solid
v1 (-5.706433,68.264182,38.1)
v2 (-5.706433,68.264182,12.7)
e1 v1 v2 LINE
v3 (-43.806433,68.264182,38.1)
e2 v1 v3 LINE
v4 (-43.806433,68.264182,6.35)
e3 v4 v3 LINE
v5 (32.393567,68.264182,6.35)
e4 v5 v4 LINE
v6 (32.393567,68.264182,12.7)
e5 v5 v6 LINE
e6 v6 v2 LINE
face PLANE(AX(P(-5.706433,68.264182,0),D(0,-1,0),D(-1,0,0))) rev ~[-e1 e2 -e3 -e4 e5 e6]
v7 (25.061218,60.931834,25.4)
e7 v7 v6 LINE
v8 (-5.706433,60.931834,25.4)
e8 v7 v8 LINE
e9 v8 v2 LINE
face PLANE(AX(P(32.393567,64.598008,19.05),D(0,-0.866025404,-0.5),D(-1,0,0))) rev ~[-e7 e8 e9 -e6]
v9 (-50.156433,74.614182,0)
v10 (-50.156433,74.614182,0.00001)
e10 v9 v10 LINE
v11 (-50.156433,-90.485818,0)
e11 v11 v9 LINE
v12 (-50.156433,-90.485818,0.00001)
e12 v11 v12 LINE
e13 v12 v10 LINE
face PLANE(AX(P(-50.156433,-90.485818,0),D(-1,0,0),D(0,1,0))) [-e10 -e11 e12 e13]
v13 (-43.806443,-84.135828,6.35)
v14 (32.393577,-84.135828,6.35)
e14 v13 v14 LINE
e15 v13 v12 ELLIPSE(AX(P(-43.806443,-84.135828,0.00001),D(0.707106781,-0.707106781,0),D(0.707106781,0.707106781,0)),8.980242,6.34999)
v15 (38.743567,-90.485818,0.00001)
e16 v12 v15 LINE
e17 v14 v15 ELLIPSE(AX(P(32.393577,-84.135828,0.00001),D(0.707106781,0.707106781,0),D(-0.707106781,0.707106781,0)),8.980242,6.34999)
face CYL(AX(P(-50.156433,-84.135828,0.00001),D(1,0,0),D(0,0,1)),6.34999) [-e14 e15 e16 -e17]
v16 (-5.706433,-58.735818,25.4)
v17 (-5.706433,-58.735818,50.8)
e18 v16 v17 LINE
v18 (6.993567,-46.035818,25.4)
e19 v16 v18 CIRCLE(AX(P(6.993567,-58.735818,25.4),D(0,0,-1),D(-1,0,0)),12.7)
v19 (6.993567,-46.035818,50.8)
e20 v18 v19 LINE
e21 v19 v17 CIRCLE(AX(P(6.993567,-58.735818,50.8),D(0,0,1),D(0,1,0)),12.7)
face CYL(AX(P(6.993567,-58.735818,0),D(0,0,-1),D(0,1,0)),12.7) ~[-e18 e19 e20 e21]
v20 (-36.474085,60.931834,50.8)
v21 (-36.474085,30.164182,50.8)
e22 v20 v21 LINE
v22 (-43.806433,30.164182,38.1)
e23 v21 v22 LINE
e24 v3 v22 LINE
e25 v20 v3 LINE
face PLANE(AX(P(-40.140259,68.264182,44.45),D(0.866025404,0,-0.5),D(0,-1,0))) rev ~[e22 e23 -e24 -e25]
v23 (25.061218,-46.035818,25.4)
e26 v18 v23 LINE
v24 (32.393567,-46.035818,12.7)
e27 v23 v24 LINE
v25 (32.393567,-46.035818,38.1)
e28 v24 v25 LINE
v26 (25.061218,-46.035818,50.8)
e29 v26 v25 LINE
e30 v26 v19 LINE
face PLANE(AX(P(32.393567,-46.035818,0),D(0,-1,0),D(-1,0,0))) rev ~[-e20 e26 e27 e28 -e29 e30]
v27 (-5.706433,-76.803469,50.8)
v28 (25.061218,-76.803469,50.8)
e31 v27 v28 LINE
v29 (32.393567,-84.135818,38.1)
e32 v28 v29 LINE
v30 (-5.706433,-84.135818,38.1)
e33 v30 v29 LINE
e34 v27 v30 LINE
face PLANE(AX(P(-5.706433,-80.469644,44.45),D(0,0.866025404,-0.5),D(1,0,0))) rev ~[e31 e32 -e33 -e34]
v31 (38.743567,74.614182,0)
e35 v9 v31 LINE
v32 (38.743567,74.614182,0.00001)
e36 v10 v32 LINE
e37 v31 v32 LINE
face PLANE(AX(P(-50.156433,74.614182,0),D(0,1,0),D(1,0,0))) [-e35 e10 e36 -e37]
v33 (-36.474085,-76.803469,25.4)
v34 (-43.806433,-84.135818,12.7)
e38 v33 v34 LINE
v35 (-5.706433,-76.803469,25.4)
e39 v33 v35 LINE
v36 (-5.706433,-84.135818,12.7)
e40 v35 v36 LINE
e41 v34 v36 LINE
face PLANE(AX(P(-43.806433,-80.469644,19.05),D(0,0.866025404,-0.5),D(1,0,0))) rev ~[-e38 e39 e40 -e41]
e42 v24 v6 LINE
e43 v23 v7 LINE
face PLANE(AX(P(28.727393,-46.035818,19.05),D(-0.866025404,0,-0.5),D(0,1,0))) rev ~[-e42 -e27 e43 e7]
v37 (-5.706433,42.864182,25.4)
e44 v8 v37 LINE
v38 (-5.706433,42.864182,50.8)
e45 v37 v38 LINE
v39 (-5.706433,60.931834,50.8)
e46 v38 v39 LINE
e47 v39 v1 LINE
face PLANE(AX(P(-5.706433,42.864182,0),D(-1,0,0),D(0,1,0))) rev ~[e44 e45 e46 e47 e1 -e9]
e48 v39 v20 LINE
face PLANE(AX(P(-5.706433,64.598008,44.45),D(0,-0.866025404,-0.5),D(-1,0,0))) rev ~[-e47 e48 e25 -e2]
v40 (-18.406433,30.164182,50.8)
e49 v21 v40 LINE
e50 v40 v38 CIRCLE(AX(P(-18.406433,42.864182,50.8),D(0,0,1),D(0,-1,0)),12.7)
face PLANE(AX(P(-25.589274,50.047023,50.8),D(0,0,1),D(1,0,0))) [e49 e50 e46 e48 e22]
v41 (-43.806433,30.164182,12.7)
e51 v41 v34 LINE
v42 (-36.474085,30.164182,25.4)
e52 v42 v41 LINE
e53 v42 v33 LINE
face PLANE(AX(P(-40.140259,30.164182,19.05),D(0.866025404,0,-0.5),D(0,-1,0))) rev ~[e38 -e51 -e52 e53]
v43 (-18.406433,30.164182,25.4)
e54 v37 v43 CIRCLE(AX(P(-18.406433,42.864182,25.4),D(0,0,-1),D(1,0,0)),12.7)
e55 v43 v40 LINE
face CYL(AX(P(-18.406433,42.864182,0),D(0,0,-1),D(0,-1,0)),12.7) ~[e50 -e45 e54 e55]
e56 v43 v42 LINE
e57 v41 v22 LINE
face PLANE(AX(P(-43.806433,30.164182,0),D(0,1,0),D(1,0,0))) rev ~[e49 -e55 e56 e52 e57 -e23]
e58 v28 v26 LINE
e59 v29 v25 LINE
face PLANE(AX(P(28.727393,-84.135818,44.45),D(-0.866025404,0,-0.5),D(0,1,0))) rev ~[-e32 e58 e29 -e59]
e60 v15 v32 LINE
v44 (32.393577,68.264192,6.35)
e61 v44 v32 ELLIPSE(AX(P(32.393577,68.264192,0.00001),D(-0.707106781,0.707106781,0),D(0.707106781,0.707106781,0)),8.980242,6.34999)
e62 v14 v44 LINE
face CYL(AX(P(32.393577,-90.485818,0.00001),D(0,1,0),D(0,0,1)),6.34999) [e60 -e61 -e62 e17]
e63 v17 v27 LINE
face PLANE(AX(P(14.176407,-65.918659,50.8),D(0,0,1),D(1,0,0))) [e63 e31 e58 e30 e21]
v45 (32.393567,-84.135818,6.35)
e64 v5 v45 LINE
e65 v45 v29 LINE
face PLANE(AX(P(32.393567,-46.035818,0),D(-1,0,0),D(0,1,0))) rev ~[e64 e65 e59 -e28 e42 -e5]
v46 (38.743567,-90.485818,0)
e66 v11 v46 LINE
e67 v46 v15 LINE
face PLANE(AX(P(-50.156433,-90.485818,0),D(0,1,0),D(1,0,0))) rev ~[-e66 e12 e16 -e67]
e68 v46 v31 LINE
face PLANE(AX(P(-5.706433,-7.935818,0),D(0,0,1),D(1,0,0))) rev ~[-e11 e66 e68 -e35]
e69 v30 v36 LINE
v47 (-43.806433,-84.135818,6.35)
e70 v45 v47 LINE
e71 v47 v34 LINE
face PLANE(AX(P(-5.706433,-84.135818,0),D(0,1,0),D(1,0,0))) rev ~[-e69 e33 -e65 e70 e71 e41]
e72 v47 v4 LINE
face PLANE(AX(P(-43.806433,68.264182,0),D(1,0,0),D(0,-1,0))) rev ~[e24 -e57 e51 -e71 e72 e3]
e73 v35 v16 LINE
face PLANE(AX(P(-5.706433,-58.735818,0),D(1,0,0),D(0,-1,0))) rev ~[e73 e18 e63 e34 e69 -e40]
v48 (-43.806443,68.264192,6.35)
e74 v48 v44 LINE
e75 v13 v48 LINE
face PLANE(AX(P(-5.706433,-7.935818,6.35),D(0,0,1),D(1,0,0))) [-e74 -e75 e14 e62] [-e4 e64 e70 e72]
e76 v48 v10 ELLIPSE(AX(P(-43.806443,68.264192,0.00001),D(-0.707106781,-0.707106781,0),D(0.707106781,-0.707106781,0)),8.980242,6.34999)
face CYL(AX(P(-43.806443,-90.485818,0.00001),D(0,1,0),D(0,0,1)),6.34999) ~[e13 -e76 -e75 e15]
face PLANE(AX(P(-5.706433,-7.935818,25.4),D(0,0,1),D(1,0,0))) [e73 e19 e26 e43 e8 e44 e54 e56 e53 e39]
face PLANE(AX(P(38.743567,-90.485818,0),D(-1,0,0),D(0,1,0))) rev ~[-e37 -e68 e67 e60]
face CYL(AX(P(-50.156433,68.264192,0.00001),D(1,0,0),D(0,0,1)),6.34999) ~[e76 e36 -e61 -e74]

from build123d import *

# Parameters (mm, degrees)
F0_W       = 88.9
F0_H       = 165.1
F1_DEPTH   = 6.35
F2_DEPTH   = 25.4
F3_DEPTH   = 50.8
F4_SIZE2   = 12.7
F4_SIZE    = 7.3323484187
F4_2_SIZE2 = 12.7
F4_2_SIZE  = 7.3323484187
F4_3_SIZE2 = 12.7
F4_3_SIZE  = 7.3323484187
F5_R       = 6.34999


# Not quite as in the source:
# - a fillet or chamfer is up to 0.001 mm smaller than in the source, because OpenCascade refuses the exact size


with BuildPart() as f1:
    # F0 (on Top) → F1 (new body)
    with BuildSketch(Plane.XY):
        with Locations((-5.7064332783, -7.9358178854)):
            Rectangle(F0_W, F0_H)
        Polygon((-43.8064332783, 30.1641821146), (-43.8064332783, 68.2641821146), (-5.7064332783, 68.2641821146), (32.3935667217, 68.2641821146), (32.3935667217, -46.0358178854), (32.3935667217, -84.1358178854), (-5.7064332783, -84.1358178854), (-43.8064332783, -84.1358178854), align=None, mode=Mode.SUBTRACT)
    extrude(amount=F1_DEPTH)

    # F0 (on Top) → F2 (join)
    with BuildSketch(Plane.XY):
        with BuildLine():
            Line((-18.4064332783, 30.1641821146), (-43.8064332783, 30.1641821146))
            Line((-43.8064332783, 30.1641821146), (-43.8064332783, -84.1358178854))
            Line((-43.8064332783, -84.1358178854), (-5.7064332783, -84.1358178854))
            Line((-5.7064332783, -84.1358178854), (-5.7064332783, -58.7358178854))
            ThreePointArc((-5.7064332783, -58.7358178854), (-1.9866893994, -49.7555617643), (6.9935667217, -46.0358178854))
            Line((6.9935667217, -46.0358178854), (32.3935667217, -46.0358178854))
            Line((32.3935667217, -46.0358178854), (32.3935667217, 68.2641821146))
            Line((32.3935667217, 68.2641821146), (-5.7064332783, 68.2641821146))
            Line((-5.7064332783, 68.2641821146), (-5.7064332783, 42.8641821146))
            ThreePointArc((-5.7064332783, 42.8641821146), (-9.4261771573, 33.8839259935), (-18.4064332783, 30.1641821146))
        make_face()
    extrude(amount=F2_DEPTH)

    # F0 (on Top) → F3 (join)
    with BuildSketch(Plane.XY):
        with BuildLine():
            Line((-5.7064332783, 68.2641821146), (-43.8064332783, 68.2641821146))
            Line((-43.8064332783, 68.2641821146), (-43.8064332783, 30.1641821146))
            Line((-43.8064332783, 30.1641821146), (-18.4064332783, 30.1641821146))
            ThreePointArc((-18.4064332783, 30.1641821146), (-9.4261771573, 33.8839259935), (-5.7064332783, 42.8641821146))
            Line((-5.7064332783, 42.8641821146), (-5.7064332783, 68.2641821146))
        make_face()
        with BuildLine():
            Line((-5.7064332783, -58.7358178854), (-5.7064332783, -84.1358178854))
            Line((-5.7064332783, -84.1358178854), (32.3935667217, -84.1358178854))
            Line((32.3935667217, -84.1358178854), (32.3935667217, -46.0358178854))
            Line((32.3935667217, -46.0358178854), (6.9935667217, -46.0358178854))
            ThreePointArc((6.9935667217, -46.0358178854), (-1.9866893994, -49.7555617643), (-5.7064332783, -58.7358178854))
        make_face()
    extrude(amount=F3_DEPTH)

    # F4
    f4_edges = [f1.edges().sort_by_distance(p)[0] for p in [
        (-24.756433, -84.135818, 25.4),
        (32.393567, 11.114182, 25.4),
        (13.343567, 68.264182, 25.4),
        (-43.806433, -26.985818, 25.4),
    ]]
    f4_side = f1.faces().sort_by_distance((-5.706433, -7.935818, 25.4))[0]
    chamfer(f4_edges, length=F4_SIZE, length2=F4_SIZE2, reference=f4_side)

    # F4#2
    f4_2_edges = [f1.edges().sort_by_distance(p)[0] for p in [
        (-24.756433, 68.264182, 50.8),
        (-43.806433, 49.214182, 50.8),
    ]]
    f4_2_side = f1.faces().sort_by_distance((-25.152475, 49.610224, 50.8))[0]
    chamfer(f4_2_edges, length=F4_2_SIZE, length2=F4_2_SIZE2, reference=f4_2_side)

    # F4#3
    f4_3_edges = [f1.edges().sort_by_distance(p)[0] for p in [
        (13.343567, -84.135818, 50.8),
        (32.393567, -65.085818, 50.8),
    ]]
    f4_3_side = f1.faces().sort_by_distance((13.739609, -65.48186, 50.8))[0]
    chamfer(f4_3_edges, length=F4_3_SIZE, length2=F4_3_SIZE2, reference=f4_3_side)

    # F5 (radius 6.35 in the source; OpenCascade refuses exactly that, so slightly less here)
    f5_edges = [f1.edges().sort_by_distance(p)[0] for p in [
        (38.743567, -7.935818, 6.35),
        (-5.706433, 74.614182, 6.35),
        (-50.156433, -7.935818, 6.35),
        (-5.706433, -90.485818, 6.35),
    ]]
    fillet(f5_edges, radius=F5_R)


solid = f1.part
